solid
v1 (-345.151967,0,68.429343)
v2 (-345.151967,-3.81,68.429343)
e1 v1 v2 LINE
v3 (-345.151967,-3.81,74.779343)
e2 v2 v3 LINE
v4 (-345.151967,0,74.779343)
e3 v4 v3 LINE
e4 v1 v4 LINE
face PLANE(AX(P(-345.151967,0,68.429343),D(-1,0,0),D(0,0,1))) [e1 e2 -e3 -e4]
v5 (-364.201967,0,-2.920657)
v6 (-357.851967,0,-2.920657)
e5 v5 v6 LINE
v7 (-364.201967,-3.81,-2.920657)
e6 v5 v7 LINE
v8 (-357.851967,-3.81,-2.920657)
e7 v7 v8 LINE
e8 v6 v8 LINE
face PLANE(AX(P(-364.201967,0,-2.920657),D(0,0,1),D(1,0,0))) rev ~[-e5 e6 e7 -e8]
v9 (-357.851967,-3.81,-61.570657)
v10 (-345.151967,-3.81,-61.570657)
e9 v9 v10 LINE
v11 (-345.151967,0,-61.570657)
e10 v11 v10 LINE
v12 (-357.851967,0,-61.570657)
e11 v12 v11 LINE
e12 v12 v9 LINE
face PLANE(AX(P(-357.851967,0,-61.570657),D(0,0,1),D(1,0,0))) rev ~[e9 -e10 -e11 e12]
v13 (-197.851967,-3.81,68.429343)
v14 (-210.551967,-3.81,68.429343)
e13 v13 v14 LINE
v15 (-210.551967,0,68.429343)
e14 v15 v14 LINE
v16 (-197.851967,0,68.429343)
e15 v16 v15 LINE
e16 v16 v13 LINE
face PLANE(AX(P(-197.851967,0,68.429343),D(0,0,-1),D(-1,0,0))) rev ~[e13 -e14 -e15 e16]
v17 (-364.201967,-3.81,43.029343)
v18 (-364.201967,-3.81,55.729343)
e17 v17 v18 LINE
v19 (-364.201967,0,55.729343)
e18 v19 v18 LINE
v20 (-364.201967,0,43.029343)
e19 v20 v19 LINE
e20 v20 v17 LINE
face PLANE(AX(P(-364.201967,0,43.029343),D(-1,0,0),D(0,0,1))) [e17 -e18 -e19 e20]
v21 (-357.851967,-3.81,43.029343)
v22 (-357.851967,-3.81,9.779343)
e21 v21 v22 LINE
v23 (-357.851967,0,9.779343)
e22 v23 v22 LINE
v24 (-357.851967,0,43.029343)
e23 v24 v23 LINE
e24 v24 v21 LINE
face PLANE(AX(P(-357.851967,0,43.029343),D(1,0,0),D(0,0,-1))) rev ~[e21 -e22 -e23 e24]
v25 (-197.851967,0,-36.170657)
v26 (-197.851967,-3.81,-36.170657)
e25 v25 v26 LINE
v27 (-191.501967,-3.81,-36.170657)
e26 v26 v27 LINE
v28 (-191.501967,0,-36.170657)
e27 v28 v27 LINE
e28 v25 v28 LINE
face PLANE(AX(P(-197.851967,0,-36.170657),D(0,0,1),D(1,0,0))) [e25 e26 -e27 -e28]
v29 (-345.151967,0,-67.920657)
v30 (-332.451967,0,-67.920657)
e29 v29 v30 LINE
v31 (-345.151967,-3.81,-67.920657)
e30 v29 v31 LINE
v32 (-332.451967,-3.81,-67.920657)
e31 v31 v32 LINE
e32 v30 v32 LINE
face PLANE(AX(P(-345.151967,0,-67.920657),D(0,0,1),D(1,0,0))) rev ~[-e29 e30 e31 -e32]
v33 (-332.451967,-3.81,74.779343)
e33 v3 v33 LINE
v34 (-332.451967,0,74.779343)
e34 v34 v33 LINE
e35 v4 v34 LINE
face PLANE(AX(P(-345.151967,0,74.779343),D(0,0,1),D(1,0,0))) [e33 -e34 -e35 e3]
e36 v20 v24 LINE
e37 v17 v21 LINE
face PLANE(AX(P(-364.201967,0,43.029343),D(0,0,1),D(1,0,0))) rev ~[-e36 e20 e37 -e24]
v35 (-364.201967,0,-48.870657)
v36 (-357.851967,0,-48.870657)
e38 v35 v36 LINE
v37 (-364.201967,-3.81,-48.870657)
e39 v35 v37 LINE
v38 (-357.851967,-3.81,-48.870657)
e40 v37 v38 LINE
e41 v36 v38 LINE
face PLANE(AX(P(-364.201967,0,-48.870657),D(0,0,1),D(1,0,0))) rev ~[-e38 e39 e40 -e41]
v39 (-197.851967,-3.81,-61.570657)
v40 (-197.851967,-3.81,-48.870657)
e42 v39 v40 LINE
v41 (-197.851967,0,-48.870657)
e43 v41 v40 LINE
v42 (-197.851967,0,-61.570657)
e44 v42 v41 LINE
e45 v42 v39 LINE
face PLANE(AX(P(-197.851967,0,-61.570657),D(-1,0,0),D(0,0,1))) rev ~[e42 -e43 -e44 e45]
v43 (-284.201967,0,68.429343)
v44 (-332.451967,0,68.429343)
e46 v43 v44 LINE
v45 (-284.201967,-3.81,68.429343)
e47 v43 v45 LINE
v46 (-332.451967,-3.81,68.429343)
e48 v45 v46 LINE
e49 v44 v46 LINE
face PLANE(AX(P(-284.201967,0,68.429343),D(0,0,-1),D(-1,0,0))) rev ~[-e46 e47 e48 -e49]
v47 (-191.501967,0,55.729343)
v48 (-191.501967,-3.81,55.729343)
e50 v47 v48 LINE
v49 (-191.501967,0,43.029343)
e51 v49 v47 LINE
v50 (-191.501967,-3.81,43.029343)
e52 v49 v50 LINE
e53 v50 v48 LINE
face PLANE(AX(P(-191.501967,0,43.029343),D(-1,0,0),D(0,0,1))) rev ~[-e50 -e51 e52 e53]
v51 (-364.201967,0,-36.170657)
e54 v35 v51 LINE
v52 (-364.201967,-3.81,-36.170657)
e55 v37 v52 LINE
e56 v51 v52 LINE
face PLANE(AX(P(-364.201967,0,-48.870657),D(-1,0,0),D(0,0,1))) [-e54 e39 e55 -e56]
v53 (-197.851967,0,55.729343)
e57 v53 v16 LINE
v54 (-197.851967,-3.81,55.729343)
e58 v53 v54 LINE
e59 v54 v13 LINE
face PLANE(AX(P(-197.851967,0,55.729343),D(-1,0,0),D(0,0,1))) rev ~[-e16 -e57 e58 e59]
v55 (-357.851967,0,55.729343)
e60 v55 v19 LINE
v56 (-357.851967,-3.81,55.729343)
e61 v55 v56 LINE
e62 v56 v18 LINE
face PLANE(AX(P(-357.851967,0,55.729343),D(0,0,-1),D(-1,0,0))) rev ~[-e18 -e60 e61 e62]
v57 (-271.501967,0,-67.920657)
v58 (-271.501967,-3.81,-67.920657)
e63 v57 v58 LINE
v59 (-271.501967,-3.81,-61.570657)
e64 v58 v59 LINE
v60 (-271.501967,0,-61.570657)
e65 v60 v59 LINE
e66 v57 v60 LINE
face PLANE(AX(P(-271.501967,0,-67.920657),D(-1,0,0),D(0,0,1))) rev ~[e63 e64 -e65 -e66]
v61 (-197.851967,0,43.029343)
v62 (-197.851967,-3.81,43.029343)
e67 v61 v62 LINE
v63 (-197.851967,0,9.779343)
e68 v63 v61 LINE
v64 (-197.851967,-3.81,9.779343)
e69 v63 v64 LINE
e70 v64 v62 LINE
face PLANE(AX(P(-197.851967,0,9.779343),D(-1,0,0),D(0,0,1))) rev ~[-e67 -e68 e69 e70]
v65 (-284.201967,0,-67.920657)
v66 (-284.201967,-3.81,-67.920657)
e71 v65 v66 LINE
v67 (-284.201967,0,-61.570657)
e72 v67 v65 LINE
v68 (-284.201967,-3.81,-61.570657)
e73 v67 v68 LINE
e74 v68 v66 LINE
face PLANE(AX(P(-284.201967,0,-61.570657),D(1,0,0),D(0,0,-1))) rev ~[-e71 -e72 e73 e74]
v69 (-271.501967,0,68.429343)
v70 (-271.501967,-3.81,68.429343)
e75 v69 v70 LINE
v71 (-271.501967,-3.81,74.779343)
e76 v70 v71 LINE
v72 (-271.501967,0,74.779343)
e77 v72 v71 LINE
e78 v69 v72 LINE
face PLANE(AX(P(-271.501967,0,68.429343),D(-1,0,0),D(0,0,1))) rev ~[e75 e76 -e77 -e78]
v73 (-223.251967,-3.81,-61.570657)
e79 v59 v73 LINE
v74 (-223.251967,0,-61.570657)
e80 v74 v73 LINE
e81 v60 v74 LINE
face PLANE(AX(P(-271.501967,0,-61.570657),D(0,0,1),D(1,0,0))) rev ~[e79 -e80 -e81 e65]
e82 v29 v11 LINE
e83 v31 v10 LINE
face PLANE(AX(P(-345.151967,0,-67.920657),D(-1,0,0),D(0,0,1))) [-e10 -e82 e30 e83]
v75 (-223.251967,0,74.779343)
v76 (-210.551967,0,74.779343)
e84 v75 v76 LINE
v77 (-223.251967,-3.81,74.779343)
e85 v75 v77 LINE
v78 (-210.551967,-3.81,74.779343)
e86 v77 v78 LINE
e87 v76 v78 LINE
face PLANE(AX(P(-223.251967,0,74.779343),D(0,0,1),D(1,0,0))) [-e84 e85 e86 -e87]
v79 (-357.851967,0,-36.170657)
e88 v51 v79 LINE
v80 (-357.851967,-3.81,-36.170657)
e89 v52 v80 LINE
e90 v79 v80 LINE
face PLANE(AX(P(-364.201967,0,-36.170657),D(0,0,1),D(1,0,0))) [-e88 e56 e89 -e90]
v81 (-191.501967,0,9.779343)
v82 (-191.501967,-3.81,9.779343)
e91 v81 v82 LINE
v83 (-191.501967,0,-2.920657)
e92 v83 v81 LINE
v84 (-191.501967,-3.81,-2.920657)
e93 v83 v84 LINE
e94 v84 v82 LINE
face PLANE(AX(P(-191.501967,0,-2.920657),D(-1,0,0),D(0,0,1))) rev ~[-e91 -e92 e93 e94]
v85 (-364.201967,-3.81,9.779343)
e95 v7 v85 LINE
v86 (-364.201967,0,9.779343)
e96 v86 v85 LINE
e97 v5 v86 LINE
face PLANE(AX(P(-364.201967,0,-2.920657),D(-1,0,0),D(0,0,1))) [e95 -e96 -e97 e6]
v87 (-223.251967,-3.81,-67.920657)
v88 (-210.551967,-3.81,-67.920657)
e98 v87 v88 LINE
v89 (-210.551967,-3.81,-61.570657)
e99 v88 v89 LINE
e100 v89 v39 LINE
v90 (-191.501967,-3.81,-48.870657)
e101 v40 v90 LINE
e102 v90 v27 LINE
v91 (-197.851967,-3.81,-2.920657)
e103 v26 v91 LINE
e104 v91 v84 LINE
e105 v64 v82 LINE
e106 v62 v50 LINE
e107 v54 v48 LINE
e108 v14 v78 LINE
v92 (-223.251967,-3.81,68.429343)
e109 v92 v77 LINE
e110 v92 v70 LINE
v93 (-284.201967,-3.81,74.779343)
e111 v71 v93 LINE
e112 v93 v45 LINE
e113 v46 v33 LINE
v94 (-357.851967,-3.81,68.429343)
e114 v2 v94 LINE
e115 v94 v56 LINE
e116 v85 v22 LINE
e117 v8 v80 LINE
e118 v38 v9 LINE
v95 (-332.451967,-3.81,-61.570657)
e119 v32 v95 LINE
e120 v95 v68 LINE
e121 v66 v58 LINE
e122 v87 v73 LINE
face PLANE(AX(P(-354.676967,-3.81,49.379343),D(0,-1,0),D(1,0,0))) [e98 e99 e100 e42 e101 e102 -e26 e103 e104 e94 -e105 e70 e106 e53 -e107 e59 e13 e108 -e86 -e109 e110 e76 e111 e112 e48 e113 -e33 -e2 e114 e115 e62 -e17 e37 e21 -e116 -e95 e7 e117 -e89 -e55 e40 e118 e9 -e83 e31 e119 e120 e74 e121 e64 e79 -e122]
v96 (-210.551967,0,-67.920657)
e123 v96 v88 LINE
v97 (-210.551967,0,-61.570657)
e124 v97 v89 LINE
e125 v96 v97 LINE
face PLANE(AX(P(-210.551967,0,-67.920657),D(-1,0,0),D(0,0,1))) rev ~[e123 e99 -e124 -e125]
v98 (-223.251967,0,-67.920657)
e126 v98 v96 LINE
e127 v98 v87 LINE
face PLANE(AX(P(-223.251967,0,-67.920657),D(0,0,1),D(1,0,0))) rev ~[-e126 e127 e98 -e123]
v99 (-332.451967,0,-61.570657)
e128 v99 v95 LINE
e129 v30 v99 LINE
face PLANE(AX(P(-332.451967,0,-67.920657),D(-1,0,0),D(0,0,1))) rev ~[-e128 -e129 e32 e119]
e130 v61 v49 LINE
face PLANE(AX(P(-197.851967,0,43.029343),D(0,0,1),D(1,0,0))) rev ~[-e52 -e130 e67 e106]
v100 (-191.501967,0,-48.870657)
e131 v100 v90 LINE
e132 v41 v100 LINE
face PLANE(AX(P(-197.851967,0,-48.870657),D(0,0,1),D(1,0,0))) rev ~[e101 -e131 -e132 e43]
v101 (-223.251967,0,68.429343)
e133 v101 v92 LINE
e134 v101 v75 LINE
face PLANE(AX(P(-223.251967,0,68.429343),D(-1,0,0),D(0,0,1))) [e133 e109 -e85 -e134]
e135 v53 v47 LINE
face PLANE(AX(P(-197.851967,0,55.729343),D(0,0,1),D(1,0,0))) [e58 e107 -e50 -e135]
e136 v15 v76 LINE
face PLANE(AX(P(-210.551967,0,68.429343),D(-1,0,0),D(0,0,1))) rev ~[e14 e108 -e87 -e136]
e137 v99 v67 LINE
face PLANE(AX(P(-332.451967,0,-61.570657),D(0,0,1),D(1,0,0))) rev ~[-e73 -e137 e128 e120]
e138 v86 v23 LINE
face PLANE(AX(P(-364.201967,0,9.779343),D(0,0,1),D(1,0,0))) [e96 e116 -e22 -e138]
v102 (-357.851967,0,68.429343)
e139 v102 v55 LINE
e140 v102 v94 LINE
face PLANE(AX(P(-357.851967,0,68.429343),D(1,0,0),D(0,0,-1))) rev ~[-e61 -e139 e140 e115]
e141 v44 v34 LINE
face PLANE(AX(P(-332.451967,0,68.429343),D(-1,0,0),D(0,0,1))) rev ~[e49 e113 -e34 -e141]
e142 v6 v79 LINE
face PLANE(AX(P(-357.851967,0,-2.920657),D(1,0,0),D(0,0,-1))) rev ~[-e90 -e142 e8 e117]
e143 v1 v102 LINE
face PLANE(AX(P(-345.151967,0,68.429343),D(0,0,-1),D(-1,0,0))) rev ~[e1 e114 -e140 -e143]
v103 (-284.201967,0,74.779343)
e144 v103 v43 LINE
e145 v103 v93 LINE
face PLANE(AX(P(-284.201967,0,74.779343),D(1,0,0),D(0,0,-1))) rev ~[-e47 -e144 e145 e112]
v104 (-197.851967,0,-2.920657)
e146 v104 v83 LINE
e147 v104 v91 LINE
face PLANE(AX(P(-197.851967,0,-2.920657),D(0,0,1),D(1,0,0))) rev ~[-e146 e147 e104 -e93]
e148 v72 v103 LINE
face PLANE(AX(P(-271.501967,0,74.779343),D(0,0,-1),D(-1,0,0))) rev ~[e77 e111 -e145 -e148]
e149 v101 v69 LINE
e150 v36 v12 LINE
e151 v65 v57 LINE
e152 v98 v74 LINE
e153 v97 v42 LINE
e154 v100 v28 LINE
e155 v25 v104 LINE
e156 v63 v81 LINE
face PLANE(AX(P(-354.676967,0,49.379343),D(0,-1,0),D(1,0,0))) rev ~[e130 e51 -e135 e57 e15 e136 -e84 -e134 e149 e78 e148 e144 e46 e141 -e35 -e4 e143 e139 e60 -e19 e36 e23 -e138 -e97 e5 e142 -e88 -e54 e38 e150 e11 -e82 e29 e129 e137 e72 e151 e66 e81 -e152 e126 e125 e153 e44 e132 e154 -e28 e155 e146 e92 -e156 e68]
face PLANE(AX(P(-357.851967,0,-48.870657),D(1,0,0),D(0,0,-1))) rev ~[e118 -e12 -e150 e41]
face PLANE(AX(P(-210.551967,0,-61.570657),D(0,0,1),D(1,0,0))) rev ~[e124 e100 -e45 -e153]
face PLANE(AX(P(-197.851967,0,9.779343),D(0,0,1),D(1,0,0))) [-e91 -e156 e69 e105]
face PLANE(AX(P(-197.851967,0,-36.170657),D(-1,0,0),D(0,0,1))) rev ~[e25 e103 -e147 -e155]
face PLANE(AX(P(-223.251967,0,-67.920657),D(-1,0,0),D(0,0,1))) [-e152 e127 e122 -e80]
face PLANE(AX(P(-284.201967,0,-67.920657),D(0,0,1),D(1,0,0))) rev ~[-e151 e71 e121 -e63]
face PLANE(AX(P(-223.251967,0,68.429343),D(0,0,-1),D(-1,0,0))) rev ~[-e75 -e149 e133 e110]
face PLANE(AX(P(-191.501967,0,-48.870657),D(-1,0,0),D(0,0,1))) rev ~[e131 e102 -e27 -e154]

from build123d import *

# Parameters (mm, degrees)
F0_W     = 6.35
F0_H     = 12.7
F0_W_2   = 12.7
F0_H_2   = 6.35
F1_DEPTH = 3.81


# Not quite as in the source:
# - a feature names something its author has since deleted; it is built from what else it names


with BuildPart() as f1:
    # F0 (on Front) → F1 (new body)
    with BuildSketch(Plane.XZ):
        with Locations((-354.6769669852, 49.3793434303)):
            Rectangle(F0_W, F0_H)
        with Locations((-361.0269669852, 49.3793434303)):
            Rectangle(F0_W, F0_H)
        Polygon((-332.4519669852, -61.5706565697), (-284.2019669852, -61.5706565697), (-284.2019669852, -55.2206565697), (-277.8519669852, -55.2206565697), (-277.8519669852, 62.0793434303), (-284.2019669852, 62.0793434303), (-284.2019669852, 68.4293434303), (-332.4519669852, 68.4293434303), (-332.4519669852, 62.0793434303), (-345.1519669852, 62.0793434303), (-345.1519669852, 68.4293434303), (-357.8519669852, 68.4293434303), (-357.8519669852, 55.7293434303), (-351.5019669852, 55.7293434303), (-351.5019669852, 43.0293434303), (-357.8519669852, 43.0293434303), (-357.8519669852, 9.7793434303), (-351.5019669852, 9.7793434303), (-351.5019669852, -2.9206565697), (-357.8519669852, -2.9206565697), (-357.8519669852, -36.1706565697), (-351.5019669852, -36.1706565697), (-351.5019669852, -48.8706565697), (-357.8519669852, -48.8706565697), (-357.8519669852, -61.5706565697), (-345.1519669852, -61.5706565697), (-345.1519669852, -55.2206565697), (-332.4519669852, -55.2206565697), align=None)
        with Locations((-338.8019669852, 65.2543434303)):
            Rectangle(F0_W_2, F0_H_2)
        with Locations((-338.8019669852, 71.6043434303)):
            Rectangle(F0_W_2, F0_H_2)
        Polygon((-210.5519669852, -61.5706565697), (-197.8519669852, -61.5706565697), (-197.8519669852, -48.8706565697), (-204.2019669852, -48.8706565697), (-204.2019669852, -36.1706565697), (-197.8519669852, -36.1706565697), (-197.8519669852, -2.9206565697), (-204.2019669852, -2.9206565697), (-204.2019669852, 9.7793434303), (-197.8519669852, 9.7793434303), (-197.8519669852, 43.0293434303), (-204.2019669852, 43.0293434303), (-204.2019669852, 55.7293434303), (-197.8519669852, 55.7293434303), (-197.8519669852, 68.4293434303), (-210.5519669852, 68.4293434303), (-210.5519669852, 62.0793434303), (-223.2519669852, 62.0793434303), (-223.2519669852, 68.4293434303), (-271.5019669852, 68.4293434303), (-271.5019669852, 62.0793434303), (-277.8519669852, 62.0793434303), (-277.8519669852, -55.2206565697), (-271.5019669852, -55.2206565697), (-271.5019669852, -61.5706565697), (-223.2519669852, -61.5706565697), (-223.2519669852, -55.2206565697), (-210.5519669852, -55.2206565697), align=None)
        Polygon((-284.2019669852, 68.4293434303), (-277.8519669852, 68.4293434303), (-271.5019669852, 68.4293434303), (-271.5019669852, 74.7793434303), (-284.2019669852, 74.7793434303), align=None)
        with Locations((-274.6769669852, 65.2543434303)):
            Rectangle(F0_W, F0_H_2)
        with Locations((-281.0269669852, 65.2543434303)):
            Rectangle(F0_W, F0_H_2)
        with Locations((-216.9019669852, 71.6043434303)):
            Rectangle(F0_W_2, F0_H_2)
        with Locations((-216.9019669852, 65.2543434303)):
            Rectangle(F0_W_2, F0_H_2)
        with Locations((-354.6769669852, 3.4293434303)):
            Rectangle(F0_W, F0_H)
        with Locations((-361.0269669852, 3.4293434303)):
            Rectangle(F0_W, F0_H)
        with Locations((-361.0269669852, -42.5206565697)):
            Rectangle(F0_W, F0_H)
        with Locations((-338.8019669852, -64.7456565697)):
            Rectangle(F0_W_2, F0_H_2)
        with Locations((-354.6769669852, -42.5206565697)):
            Rectangle(F0_W, F0_H)
        with Locations((-338.8019669852, -58.3956565697)):
            Rectangle(F0_W_2, F0_H_2)
        with Locations((-281.0269669852, -58.3956565697)):
            Rectangle(F0_W, F0_H_2)
        with Locations((-274.6769669852, -58.3956565697)):
            Rectangle(F0_W, F0_H_2)
        Polygon((-271.5019669852, -67.9206565697), (-271.5019669852, -61.5706565697), (-277.8519669852, -61.5706565697), (-284.2019669852, -61.5706565697), (-284.2019669852, -67.9206565697), align=None)
        with Locations((-216.9019669852, -64.7456565697)):
            Rectangle(F0_W_2, F0_H_2)
        with Locations((-216.9019669852, -58.3956565697)):
            Rectangle(F0_W_2, F0_H_2)
        with Locations((-201.0269669852, -42.5206565697)):
            Rectangle(F0_W, F0_H)
        with Locations((-194.6769669852, -42.5206565697)):
            Rectangle(F0_W, F0_H)
        with Locations((-201.0269669852, 3.4293434303)):
            Rectangle(F0_W, F0_H)
        with Locations((-194.6769669852, 3.4293434303)):
            Rectangle(F0_W, F0_H)
        with Locations((-201.0269669852, 49.3793434303)):
            Rectangle(F0_W, F0_H)
        with Locations((-194.6769669852, 49.3793434303)):
            Rectangle(F0_W, F0_H)
    extrude(amount=F1_DEPTH)


solid = f1.part
